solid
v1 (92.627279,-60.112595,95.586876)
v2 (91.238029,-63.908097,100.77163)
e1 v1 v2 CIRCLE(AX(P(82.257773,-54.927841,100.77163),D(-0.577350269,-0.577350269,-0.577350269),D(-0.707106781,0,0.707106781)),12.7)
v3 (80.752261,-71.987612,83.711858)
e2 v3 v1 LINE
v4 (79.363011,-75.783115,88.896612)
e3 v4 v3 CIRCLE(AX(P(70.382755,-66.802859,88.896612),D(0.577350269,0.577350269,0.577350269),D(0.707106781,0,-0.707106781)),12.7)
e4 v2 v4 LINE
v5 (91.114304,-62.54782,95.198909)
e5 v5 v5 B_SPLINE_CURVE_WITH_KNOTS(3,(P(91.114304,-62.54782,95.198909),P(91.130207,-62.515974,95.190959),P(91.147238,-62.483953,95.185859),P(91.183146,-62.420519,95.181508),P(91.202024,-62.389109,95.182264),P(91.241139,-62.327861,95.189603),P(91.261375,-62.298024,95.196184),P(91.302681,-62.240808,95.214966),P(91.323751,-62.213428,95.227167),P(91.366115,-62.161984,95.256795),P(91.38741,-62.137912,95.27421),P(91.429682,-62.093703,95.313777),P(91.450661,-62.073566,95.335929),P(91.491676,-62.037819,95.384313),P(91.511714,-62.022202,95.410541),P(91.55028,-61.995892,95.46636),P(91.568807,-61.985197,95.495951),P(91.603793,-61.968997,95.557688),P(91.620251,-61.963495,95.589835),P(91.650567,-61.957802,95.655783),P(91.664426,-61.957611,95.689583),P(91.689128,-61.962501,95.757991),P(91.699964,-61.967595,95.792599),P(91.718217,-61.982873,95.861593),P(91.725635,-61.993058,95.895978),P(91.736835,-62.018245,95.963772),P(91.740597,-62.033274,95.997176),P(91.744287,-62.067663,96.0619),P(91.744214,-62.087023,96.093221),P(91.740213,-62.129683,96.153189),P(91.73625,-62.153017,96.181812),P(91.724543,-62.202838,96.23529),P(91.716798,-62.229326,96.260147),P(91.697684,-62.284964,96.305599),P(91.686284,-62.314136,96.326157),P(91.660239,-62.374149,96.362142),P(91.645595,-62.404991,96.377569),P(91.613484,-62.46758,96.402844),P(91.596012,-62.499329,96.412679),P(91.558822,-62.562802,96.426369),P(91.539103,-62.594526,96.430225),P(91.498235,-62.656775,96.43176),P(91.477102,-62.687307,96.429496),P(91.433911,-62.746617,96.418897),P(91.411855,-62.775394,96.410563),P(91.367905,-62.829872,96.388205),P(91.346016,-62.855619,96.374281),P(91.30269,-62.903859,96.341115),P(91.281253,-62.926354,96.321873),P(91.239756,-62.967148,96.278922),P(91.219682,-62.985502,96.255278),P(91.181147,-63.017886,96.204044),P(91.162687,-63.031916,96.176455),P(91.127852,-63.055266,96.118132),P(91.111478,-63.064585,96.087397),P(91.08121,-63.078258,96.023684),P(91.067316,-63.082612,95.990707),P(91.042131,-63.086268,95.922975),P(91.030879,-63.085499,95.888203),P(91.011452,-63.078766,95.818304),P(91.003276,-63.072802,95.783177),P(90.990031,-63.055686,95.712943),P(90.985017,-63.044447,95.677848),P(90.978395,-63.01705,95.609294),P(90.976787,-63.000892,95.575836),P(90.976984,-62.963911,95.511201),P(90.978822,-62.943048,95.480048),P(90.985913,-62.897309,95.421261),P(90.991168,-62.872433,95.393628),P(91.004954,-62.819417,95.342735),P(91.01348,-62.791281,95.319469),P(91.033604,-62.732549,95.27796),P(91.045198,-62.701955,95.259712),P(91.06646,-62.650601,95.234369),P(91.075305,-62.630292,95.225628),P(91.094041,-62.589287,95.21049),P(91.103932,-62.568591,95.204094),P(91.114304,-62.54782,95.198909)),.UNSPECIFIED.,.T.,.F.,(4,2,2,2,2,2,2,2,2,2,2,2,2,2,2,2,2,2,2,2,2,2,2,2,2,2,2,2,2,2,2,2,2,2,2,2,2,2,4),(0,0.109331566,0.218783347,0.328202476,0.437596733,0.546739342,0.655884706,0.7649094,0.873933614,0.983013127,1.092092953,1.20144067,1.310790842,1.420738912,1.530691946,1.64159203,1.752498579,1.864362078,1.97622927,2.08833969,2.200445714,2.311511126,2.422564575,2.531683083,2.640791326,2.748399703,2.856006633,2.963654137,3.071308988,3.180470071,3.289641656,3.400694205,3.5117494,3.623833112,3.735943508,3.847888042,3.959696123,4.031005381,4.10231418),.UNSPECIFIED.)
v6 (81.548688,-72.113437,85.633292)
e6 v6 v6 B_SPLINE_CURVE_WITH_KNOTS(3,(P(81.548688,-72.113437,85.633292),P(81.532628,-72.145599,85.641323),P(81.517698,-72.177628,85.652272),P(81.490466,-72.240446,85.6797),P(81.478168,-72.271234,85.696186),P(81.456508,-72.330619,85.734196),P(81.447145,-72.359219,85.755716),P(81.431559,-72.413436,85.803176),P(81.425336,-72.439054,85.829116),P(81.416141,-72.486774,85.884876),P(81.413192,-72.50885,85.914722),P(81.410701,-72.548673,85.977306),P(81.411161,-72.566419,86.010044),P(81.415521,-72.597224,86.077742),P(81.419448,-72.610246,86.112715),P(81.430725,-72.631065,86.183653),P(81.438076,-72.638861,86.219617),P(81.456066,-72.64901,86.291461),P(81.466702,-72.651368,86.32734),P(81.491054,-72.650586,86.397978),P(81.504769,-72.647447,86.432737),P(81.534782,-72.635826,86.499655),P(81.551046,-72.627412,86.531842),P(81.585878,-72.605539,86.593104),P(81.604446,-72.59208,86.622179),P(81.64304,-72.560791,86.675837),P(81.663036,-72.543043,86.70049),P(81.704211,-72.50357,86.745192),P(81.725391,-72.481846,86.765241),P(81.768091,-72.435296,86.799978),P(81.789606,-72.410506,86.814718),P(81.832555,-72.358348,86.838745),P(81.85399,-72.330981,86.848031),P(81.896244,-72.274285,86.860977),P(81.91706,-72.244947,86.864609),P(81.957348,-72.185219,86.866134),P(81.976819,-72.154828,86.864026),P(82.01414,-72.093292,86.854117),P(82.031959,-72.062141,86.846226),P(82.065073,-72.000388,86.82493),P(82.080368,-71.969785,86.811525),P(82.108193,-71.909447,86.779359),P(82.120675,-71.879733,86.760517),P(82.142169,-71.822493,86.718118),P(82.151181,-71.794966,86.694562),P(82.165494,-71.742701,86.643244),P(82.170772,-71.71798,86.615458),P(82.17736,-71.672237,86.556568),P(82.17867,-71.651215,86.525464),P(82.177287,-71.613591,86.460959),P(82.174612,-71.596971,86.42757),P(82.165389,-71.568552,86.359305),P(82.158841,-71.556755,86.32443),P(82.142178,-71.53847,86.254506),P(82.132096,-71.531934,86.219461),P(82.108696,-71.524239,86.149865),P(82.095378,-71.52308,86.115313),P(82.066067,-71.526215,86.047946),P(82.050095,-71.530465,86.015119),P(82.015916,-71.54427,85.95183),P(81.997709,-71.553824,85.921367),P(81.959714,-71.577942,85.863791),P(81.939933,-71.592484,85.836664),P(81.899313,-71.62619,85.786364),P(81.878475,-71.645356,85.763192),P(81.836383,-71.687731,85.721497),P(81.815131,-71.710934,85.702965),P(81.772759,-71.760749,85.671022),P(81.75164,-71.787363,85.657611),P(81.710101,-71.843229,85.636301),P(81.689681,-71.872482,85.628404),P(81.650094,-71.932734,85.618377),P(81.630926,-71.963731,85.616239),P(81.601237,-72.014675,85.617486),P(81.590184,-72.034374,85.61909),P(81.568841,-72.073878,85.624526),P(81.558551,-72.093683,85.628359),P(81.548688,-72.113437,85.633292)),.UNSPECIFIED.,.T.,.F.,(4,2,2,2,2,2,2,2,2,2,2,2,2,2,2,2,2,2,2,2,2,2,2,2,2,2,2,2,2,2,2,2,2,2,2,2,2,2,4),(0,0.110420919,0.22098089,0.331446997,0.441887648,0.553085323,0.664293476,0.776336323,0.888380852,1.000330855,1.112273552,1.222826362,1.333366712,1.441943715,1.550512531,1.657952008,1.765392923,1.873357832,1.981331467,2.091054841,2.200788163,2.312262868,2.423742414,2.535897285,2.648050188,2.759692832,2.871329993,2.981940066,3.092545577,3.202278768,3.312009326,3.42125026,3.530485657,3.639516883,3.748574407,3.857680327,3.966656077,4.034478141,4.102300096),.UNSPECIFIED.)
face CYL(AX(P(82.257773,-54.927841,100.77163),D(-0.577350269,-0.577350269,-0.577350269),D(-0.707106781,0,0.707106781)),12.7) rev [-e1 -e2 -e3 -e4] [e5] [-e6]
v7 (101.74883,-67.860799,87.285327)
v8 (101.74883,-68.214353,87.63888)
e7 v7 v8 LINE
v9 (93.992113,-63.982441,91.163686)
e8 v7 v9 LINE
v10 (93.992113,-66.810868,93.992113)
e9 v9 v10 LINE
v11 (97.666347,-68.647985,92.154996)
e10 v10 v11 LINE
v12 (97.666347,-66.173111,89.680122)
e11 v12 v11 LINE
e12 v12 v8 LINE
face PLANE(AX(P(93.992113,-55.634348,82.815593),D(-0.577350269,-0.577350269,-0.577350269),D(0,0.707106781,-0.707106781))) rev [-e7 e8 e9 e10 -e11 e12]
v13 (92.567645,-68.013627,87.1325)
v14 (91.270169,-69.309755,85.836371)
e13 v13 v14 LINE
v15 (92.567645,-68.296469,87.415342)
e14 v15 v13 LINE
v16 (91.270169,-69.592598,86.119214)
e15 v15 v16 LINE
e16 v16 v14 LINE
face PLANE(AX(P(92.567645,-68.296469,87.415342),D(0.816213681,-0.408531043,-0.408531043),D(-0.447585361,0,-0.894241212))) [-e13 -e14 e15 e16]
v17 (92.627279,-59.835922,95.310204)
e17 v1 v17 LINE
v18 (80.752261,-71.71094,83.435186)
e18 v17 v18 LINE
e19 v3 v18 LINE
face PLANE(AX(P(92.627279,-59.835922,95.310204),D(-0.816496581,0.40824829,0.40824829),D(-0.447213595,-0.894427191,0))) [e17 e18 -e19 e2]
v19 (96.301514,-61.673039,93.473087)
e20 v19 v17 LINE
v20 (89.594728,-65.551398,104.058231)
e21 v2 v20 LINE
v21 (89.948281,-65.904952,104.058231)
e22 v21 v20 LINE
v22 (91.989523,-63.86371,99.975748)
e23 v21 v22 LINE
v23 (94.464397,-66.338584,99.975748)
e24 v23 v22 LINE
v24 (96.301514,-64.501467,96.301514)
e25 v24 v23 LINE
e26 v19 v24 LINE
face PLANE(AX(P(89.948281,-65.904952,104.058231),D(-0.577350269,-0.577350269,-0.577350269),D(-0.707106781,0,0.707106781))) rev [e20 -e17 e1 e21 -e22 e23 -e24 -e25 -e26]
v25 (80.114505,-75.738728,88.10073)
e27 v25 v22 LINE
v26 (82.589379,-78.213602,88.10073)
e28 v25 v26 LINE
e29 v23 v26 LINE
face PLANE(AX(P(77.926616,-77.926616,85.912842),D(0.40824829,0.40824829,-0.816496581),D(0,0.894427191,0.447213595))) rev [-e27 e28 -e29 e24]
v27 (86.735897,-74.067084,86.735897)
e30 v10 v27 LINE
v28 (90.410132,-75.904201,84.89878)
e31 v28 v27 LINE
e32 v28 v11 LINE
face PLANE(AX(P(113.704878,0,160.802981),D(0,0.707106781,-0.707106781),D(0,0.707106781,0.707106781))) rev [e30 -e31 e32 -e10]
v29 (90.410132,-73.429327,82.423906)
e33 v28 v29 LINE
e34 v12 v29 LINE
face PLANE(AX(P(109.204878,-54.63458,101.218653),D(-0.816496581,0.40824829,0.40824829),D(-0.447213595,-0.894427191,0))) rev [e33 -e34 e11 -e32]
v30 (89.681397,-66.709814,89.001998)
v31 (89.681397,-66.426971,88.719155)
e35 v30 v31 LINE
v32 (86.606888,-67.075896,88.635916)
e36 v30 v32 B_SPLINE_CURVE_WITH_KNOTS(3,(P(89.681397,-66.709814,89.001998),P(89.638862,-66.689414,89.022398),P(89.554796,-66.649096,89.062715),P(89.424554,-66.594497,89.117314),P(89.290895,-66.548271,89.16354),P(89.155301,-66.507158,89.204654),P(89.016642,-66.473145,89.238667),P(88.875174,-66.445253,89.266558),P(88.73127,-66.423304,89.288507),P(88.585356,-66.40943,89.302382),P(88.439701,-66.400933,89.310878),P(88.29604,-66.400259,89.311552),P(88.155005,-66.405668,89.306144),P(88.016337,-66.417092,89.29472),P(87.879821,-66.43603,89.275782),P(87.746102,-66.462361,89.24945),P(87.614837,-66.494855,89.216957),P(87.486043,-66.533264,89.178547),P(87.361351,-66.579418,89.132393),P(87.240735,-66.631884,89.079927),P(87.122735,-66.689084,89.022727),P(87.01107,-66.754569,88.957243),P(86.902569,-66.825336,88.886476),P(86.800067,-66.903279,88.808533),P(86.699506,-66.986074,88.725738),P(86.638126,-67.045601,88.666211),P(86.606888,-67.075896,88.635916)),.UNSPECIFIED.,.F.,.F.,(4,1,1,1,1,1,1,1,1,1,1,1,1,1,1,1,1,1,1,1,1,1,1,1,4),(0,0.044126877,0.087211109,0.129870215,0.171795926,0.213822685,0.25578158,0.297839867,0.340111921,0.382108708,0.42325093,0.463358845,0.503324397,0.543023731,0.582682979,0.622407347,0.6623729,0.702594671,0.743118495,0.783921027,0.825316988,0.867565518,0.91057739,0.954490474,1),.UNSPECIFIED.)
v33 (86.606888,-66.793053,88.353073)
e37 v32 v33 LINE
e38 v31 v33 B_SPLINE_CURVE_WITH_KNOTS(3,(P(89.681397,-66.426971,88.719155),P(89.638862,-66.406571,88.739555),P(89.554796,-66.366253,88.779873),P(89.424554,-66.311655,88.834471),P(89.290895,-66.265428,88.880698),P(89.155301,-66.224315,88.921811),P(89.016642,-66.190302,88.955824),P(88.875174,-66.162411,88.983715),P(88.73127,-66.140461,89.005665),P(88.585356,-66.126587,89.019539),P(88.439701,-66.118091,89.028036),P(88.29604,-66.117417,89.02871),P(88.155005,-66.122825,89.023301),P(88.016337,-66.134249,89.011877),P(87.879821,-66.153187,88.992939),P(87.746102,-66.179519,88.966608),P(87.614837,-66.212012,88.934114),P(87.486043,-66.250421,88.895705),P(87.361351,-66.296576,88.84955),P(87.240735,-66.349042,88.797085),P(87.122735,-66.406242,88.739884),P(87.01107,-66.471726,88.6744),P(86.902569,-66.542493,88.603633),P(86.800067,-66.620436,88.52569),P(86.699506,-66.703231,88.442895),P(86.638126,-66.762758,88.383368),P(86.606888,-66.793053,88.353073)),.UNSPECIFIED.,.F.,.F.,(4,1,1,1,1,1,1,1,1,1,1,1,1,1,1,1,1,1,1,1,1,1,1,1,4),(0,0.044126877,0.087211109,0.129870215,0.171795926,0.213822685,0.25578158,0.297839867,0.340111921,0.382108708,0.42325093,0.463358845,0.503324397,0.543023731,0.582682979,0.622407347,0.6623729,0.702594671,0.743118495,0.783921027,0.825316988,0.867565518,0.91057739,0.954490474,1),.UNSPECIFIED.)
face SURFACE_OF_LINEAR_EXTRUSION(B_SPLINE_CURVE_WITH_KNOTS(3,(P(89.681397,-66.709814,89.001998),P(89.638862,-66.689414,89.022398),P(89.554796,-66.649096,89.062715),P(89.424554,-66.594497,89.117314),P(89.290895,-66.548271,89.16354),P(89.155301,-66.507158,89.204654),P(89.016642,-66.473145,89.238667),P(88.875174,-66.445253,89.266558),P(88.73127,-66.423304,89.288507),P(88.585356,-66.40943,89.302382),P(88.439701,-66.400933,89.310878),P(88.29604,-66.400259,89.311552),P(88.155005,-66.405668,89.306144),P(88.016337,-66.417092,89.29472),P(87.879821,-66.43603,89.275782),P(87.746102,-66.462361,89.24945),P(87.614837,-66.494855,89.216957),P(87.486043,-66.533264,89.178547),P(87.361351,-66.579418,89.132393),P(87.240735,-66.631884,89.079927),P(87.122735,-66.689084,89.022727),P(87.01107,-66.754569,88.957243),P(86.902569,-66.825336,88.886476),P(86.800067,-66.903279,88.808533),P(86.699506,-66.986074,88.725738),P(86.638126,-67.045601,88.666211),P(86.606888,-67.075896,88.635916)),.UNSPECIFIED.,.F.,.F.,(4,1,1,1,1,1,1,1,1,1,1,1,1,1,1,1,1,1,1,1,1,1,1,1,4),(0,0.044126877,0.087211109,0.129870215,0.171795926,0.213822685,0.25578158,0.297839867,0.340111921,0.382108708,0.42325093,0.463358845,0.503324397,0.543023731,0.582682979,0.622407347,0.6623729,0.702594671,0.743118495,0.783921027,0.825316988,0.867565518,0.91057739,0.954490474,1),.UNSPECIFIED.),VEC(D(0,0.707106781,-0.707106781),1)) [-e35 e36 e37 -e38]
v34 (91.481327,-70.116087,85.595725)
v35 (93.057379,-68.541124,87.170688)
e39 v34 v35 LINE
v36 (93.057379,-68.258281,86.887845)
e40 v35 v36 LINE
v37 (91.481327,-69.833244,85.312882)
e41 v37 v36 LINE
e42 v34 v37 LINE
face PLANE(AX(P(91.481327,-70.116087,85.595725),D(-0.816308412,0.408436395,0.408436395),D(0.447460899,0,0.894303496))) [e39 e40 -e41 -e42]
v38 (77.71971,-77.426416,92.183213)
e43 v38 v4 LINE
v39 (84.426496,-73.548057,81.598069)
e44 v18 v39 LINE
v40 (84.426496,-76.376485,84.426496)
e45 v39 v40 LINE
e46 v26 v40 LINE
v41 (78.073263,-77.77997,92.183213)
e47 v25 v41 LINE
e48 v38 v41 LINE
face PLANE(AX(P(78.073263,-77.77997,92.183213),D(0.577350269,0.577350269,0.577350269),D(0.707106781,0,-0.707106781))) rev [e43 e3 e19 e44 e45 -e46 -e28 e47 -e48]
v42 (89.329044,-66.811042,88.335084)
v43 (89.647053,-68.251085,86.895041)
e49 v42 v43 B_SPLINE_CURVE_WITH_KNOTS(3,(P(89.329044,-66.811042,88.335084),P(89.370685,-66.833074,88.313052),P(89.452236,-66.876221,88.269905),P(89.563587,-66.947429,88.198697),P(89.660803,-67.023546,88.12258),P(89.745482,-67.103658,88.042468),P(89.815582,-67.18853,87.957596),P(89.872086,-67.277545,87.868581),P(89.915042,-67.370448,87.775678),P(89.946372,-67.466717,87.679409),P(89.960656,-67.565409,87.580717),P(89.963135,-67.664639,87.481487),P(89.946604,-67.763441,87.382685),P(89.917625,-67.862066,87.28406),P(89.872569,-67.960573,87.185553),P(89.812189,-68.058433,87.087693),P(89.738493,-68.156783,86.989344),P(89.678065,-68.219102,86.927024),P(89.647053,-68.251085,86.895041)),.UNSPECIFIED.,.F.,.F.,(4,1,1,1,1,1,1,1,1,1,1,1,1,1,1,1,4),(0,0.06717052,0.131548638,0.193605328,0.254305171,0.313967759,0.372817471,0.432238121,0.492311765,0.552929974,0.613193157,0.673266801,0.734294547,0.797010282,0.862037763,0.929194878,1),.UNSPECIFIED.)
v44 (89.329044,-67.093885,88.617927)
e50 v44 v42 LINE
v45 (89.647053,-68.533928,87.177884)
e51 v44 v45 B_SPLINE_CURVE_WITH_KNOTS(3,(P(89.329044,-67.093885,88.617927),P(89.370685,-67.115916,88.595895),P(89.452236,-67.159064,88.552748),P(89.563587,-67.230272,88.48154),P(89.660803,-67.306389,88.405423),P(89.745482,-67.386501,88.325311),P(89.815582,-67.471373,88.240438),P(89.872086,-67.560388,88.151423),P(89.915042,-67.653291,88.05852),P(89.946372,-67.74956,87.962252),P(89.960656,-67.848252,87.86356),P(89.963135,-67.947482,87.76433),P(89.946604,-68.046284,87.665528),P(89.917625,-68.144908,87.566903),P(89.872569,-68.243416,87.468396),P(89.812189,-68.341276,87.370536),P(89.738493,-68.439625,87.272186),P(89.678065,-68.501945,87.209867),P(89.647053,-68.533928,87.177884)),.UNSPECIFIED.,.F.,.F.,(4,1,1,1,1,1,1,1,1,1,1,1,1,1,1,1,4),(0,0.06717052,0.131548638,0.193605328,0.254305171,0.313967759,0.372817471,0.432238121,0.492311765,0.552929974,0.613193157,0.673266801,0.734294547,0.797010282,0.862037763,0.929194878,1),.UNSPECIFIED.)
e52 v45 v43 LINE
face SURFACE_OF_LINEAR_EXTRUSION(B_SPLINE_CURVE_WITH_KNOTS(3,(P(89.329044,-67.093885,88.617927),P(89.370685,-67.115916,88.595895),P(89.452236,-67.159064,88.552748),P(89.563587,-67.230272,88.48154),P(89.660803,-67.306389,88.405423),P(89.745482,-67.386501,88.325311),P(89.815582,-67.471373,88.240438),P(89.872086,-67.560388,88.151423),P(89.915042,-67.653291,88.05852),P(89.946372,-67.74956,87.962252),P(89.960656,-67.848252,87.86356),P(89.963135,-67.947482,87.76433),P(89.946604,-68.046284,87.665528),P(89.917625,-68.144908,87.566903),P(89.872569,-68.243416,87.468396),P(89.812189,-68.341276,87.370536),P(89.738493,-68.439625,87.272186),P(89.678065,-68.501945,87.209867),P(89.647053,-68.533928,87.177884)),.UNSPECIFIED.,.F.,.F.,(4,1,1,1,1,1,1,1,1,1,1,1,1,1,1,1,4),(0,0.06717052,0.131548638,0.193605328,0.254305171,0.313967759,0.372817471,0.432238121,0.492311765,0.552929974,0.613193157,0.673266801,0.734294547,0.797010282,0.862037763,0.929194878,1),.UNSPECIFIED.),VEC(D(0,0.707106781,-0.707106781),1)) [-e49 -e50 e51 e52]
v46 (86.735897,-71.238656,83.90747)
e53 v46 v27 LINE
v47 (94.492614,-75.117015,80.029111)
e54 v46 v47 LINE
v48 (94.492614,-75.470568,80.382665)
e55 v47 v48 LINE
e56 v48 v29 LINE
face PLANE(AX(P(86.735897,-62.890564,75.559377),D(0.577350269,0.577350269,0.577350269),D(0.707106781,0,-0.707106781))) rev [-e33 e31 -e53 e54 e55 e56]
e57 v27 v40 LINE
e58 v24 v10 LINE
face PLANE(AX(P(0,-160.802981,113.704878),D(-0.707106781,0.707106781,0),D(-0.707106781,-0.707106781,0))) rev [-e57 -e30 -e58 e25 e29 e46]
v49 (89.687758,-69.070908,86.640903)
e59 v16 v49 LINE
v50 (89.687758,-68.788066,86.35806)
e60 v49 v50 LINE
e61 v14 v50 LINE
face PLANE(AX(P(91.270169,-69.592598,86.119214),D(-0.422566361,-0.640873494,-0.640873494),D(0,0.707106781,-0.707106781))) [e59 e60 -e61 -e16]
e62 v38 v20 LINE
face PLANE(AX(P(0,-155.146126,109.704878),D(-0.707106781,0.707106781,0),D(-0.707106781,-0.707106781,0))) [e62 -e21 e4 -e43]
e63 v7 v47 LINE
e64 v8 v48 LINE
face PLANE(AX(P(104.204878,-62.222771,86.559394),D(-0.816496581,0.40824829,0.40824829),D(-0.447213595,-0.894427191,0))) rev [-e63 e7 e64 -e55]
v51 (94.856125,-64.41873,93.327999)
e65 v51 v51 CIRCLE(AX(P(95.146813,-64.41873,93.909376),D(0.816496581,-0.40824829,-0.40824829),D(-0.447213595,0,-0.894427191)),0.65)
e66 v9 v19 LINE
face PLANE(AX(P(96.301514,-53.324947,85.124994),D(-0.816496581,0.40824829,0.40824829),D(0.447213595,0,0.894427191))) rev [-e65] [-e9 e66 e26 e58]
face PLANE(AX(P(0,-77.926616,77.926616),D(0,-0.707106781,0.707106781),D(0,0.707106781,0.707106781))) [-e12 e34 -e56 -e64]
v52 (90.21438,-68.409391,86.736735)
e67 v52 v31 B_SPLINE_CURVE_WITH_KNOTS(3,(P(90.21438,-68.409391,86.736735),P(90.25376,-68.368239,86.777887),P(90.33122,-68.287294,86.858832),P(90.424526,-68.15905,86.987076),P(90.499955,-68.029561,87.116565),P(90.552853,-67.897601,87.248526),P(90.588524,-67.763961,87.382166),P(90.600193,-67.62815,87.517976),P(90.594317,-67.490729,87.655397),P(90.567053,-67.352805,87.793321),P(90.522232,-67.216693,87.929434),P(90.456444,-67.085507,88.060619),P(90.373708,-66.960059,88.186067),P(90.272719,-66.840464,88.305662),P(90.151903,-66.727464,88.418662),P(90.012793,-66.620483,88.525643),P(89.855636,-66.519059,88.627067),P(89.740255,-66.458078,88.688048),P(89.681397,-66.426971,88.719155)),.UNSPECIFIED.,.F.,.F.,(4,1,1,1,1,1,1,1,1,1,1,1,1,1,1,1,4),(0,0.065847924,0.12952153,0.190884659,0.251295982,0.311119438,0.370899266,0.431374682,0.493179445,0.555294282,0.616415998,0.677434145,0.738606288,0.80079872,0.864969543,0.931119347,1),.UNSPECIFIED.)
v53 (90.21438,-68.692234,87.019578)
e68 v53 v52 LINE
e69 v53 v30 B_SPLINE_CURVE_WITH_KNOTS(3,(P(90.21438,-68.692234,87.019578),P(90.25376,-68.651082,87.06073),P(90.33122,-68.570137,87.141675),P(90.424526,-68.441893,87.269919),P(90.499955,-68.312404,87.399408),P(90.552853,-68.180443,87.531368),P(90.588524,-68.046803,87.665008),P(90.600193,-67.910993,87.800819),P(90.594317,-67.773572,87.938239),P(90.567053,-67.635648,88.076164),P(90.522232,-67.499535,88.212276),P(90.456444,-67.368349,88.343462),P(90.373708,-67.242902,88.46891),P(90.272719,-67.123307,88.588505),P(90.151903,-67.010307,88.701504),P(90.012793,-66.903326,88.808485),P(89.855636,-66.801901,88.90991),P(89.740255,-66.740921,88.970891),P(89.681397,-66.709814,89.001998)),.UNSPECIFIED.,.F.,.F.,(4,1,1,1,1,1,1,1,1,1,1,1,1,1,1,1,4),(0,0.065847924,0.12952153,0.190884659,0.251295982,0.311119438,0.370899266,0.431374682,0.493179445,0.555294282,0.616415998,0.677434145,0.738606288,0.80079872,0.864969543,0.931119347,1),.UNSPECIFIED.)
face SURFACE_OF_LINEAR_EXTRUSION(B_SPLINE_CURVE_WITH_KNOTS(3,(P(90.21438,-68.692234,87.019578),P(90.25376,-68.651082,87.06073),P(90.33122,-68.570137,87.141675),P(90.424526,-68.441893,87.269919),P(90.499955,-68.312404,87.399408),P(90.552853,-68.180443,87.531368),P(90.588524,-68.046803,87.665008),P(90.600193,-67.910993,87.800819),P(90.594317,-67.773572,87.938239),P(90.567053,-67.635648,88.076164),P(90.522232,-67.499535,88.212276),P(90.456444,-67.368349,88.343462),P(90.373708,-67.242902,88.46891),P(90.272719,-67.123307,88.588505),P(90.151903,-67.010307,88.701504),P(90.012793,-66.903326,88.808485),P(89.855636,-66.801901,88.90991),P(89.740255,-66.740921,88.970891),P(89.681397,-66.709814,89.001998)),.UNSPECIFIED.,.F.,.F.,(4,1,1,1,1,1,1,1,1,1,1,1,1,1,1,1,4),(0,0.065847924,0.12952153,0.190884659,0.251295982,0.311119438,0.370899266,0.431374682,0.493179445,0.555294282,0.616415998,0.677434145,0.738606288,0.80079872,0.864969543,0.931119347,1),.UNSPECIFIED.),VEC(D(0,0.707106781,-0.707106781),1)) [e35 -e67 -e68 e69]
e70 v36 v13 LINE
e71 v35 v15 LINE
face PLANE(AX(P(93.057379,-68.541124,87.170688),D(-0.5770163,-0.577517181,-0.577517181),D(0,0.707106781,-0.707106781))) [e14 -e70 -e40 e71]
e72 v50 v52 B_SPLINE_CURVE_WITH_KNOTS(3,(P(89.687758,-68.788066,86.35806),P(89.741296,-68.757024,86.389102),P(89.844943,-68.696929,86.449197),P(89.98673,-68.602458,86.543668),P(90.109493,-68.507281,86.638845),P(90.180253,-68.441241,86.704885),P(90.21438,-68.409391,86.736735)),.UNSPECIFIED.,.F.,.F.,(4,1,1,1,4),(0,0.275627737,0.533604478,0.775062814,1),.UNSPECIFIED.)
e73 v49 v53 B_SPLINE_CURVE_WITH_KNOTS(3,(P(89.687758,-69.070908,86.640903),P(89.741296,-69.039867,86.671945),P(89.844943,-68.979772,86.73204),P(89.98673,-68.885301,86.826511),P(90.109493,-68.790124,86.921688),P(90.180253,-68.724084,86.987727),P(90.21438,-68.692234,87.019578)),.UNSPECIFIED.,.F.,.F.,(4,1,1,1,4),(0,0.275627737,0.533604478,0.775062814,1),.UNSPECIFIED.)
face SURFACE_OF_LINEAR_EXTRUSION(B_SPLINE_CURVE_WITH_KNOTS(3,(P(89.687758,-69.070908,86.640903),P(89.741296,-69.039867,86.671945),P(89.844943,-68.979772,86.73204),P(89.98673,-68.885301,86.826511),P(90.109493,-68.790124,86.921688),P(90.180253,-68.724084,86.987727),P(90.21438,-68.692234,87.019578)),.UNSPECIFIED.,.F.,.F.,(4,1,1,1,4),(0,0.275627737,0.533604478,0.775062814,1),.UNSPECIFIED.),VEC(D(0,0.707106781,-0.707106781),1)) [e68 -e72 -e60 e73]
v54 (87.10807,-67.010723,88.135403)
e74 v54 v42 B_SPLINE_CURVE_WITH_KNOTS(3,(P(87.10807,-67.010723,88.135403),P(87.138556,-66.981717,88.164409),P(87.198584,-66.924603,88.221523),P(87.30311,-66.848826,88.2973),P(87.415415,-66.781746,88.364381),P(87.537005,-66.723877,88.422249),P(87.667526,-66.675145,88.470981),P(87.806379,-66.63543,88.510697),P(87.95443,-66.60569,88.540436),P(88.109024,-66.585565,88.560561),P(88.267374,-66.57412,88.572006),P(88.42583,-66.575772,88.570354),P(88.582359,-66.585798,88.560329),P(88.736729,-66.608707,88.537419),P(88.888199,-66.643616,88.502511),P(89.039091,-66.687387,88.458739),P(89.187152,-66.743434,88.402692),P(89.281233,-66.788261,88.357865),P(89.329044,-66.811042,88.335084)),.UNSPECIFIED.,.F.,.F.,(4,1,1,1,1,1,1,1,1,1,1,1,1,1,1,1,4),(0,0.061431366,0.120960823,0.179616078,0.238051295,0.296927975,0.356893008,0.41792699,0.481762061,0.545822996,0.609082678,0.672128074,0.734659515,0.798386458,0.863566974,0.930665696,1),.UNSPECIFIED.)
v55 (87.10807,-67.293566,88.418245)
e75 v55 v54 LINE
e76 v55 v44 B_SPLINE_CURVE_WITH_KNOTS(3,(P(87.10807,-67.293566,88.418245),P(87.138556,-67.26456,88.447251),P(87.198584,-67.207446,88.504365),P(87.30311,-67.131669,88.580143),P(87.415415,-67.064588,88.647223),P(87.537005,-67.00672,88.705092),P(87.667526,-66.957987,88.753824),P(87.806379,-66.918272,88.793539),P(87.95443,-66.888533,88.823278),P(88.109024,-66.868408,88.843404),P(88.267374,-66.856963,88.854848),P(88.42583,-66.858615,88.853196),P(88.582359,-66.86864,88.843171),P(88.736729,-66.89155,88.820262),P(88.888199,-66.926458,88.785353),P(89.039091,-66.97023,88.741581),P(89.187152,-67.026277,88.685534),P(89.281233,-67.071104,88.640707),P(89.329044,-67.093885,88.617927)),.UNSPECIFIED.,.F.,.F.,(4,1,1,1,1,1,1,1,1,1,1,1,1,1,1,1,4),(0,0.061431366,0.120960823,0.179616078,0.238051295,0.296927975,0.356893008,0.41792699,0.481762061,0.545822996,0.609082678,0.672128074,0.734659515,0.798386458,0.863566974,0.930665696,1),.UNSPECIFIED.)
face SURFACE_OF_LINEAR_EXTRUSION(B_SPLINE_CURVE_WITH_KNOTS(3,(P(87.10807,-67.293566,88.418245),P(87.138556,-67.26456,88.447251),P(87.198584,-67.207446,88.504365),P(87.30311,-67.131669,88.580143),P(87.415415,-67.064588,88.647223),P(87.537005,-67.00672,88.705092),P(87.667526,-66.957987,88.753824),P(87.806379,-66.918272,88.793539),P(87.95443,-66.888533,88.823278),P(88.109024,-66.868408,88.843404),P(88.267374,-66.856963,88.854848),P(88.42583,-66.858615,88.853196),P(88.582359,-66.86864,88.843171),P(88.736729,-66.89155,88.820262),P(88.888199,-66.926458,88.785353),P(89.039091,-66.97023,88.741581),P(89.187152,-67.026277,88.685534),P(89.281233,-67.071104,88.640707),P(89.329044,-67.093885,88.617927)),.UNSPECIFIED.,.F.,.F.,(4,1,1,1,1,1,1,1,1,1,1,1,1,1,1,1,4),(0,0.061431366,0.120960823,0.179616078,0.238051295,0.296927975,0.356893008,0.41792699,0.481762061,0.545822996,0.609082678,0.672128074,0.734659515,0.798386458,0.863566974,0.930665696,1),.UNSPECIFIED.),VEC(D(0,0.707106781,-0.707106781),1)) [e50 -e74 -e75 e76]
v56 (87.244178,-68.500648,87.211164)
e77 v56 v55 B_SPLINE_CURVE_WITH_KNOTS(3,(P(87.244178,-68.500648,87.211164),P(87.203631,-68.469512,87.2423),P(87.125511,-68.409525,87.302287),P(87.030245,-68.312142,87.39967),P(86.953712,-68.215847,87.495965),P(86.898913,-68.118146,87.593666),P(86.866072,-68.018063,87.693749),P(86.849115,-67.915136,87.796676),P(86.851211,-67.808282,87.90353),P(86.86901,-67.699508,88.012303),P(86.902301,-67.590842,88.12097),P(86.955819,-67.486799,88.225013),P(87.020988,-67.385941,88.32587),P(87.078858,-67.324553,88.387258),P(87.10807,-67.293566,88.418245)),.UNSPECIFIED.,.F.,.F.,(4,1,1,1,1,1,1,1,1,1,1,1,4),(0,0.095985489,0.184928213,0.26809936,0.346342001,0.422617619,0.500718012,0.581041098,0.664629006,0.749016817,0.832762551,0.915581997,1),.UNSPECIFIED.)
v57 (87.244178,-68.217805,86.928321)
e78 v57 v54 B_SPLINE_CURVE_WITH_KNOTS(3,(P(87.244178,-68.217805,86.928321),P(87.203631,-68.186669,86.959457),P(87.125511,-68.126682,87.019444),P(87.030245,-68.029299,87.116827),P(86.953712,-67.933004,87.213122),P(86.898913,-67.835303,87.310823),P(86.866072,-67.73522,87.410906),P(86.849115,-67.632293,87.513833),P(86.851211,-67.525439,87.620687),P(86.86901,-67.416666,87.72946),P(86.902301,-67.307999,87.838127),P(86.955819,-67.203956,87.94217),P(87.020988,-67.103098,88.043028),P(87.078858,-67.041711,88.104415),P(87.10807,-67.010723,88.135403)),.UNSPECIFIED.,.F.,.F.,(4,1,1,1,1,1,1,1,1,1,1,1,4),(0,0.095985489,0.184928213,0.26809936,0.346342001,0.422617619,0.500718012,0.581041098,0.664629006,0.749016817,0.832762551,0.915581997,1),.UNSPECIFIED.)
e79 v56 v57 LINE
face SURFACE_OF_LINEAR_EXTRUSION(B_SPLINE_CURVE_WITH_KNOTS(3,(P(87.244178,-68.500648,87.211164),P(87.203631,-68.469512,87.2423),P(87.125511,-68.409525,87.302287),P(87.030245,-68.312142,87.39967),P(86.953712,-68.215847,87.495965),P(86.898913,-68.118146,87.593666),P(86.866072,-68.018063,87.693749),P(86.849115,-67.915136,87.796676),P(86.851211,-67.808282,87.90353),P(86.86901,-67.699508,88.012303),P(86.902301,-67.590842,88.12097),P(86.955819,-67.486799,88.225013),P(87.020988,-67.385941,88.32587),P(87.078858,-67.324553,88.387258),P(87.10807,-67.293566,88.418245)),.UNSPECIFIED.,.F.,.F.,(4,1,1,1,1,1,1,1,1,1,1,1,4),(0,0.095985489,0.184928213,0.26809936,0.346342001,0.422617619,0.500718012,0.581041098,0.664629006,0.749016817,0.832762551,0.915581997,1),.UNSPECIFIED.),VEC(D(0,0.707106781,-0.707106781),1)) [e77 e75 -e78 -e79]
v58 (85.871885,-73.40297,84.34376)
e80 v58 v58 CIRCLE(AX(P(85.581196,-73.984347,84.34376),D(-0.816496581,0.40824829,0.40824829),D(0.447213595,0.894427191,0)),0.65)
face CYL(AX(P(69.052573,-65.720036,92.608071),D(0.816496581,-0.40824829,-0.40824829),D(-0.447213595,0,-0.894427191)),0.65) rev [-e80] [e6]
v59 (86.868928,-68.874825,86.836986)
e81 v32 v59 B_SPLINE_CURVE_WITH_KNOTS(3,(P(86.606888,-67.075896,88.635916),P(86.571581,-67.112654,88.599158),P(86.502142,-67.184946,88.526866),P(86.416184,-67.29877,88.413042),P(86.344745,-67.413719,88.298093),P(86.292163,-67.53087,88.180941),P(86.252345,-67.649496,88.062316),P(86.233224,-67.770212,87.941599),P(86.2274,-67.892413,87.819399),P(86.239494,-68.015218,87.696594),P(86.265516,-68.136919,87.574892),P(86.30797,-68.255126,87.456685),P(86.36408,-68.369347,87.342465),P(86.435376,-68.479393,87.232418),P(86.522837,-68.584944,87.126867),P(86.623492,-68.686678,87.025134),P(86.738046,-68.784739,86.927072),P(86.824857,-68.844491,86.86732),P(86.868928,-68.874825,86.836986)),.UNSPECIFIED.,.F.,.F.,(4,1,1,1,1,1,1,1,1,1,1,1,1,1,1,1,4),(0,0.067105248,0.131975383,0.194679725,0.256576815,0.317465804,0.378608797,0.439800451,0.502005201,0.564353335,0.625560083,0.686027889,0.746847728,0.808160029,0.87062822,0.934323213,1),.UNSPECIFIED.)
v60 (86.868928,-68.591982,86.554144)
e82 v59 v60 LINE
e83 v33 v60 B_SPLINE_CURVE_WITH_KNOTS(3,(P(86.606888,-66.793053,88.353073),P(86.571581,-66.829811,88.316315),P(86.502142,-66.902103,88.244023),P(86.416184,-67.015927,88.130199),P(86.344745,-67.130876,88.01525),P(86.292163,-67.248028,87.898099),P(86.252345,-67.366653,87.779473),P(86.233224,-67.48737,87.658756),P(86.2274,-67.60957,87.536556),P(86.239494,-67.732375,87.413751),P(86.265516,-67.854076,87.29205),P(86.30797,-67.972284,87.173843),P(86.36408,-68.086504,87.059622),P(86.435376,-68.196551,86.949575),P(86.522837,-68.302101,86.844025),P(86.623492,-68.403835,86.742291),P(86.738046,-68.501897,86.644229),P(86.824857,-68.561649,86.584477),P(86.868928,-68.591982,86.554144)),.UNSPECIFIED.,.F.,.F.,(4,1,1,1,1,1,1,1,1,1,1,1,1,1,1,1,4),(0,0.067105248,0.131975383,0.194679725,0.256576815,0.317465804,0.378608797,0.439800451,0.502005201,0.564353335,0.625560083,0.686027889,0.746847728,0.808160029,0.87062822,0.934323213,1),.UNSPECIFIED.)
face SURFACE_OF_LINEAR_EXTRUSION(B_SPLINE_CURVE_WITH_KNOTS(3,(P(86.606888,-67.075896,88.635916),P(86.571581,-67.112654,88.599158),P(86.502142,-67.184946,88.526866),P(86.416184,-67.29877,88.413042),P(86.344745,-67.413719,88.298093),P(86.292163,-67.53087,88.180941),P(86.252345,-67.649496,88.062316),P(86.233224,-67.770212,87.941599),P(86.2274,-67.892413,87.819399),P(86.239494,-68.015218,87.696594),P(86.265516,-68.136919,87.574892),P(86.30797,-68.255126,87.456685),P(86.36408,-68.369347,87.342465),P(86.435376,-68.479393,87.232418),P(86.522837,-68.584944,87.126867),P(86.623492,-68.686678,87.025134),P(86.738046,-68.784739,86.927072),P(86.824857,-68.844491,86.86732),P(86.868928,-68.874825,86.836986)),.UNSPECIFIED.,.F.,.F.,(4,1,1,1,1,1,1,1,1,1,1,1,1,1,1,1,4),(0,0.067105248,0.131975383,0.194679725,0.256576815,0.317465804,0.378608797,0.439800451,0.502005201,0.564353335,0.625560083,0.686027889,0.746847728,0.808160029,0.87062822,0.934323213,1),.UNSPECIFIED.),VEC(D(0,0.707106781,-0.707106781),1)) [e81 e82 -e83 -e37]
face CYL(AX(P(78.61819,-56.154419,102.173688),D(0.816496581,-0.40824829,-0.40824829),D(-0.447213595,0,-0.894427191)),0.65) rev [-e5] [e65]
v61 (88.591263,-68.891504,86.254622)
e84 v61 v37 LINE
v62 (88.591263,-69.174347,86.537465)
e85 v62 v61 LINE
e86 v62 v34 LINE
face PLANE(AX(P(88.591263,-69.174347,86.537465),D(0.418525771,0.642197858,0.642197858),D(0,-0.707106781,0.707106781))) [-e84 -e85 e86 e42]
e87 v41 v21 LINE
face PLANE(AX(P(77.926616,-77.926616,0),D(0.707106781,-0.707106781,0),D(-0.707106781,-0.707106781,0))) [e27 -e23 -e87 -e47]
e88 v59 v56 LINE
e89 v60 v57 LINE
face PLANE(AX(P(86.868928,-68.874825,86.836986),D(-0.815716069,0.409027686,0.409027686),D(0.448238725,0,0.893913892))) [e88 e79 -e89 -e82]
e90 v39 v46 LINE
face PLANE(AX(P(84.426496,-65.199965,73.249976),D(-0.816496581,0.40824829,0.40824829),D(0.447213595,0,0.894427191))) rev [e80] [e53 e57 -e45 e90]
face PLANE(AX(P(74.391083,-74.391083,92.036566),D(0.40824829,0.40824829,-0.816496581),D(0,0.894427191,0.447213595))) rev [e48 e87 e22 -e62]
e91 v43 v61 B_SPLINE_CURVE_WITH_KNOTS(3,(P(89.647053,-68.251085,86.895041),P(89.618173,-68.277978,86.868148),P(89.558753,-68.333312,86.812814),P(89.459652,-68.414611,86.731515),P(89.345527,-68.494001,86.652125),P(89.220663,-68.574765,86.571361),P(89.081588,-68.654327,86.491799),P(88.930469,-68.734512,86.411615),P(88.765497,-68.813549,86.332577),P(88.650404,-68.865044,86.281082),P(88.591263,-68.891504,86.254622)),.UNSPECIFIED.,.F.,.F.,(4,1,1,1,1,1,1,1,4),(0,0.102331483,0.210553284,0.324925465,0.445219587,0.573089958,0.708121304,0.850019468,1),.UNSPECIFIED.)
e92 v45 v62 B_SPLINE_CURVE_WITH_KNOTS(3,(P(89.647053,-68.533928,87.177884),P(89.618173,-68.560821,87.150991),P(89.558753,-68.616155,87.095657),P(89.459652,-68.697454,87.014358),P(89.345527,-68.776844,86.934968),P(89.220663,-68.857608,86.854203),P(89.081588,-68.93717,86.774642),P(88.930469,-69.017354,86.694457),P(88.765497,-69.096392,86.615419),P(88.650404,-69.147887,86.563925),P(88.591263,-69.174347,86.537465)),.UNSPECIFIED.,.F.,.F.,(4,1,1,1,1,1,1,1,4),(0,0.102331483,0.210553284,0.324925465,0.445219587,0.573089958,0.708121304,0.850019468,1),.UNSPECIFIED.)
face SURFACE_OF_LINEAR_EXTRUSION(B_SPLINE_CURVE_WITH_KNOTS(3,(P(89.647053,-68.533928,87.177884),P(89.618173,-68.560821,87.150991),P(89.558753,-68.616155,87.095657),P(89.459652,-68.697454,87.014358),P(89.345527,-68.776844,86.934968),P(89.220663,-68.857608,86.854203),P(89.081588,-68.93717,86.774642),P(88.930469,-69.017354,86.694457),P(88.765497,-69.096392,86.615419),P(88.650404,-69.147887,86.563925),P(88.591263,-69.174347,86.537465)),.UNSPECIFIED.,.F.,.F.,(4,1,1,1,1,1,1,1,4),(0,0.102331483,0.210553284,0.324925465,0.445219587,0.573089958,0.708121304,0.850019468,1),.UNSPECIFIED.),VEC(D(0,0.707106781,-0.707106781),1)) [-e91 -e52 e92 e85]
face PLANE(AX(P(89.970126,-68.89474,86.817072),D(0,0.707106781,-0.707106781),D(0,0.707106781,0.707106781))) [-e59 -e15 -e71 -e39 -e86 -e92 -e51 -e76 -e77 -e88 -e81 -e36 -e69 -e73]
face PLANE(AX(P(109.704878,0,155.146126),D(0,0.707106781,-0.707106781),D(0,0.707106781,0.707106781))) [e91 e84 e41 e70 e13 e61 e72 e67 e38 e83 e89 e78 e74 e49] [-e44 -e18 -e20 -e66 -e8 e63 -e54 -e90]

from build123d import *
from build123d.topology import SkipClean

# Parameters (mm, degrees)
STOCK_GOUX_START         = 53.391336338
STOCK_GOUX_LIKED_1_DEPTH = 20.568134432
CUT_EXTRUDE1_DEPTH       = 109.511360444
BOSS_EXTRUDE1_DEPTH      = 20.568134
FILLET1_R                = 12.7
SKETCH3_R                = 0.64999997
CUT_EXTRUDE2_DEPTH       = 149.612005727
CUT_EXTRUDE3_DEPTH       = 0.4


# Read off the part's stored shape, not the designer's step: Stock-Goux Liked-1
with BuildPart() as part:
    # Stock-Goux Liked-1 outline → Stock-Goux Liked-1 (new body)
    with BuildSketch(Plane(origin=(0, 0, 0), x_dir=(0.8164965809277512, -0.4082482904637994, -0.40824829046387656), z_dir=(0.5773502691895902, 0.5773502691895891, 0.5773502691896982)).offset(STOCK_GOUX_START)):
        Polygon((57.433440297, -119.932119095), (57.866453013, -120.182119103), (60.366452966, -115.851992166), (63.397541976, -117.601992222), (65.647541921, -113.704878), (70.147541811, -113.704878), (70.147541811, -110.204877888), (75.147541717, -110.204877888), (75.147541717, -109.704877872), (63.338140771, -109.704877872), align=None)
    extrude(amount=STOCK_GOUX_LIKED_1_DEPTH)

    # Sketch1 → Cut-Extrude1 (cut, through all)
    with BuildSketch(Plane(origin=(0, -80.401490288, 80.401490288), x_dir=(1, 0, 0), z_dir=(0, -0.7071067811865477, 0.7071067811865475))):
        Polygon((84.426495932, 5.692217571), (86.735897009, 8.958203895), (94.492614361, 3.473376455), (92.183213285, 0.207390132), align=None)
        Polygon((96.301513883, 22.486029011), (104.058231236, 17.001201571), (101.748830159, 13.735215248), (93.992112807, 19.220042687), align=None)
    extrude(amount=-CUT_EXTRUDE1_DEPTH, mode=Mode.SUBTRACT)

    # Sketch2 → Boss-Extrude1 (add)
    with SkipClean():  # the faces are left unmerged after this step: merging them gives an invalid solid
        with BuildSketch(Plane(origin=(30.825502407, 30.825502407, 30.825502407), x_dir=(-0.40824829046391425, -0.4082482904639143, 0.8164965809276746), z_dir=(-0.5773502691895895, -0.5773502691895894, -0.5773502691896983))):
            Polygon((62.183440195, -111.704877936), (65.647541921, -113.704878), (67.897541921, -109.807763683), (64.433440195, -107.807763619), align=None)
        extrude(amount=-BOSS_EXTRUDE1_DEPTH)

    # Fillet1
    fillet1_edges = [part.edges().sort_by_distance(p)[0] for p in [
        (86.689770169, -68.456355976, 92.055619581),
    ]]
    fillet(fillet1_edges, radius=FILLET1_R)

    # Sketch3 → Cut-Extrude2 (cut, through all)
    with SkipClean():  # the faces are left unmerged after this step: merging them gives an invalid solid
        with BuildSketch(Plane(origin=(53.600993525, -26.800496763, -26.800496763), x_dir=(-0.36514837167009556, 0.18257418583503127, -0.9128709291752878), z_dir=(0.8164965809277506, -0.40824829046383865, -0.4082482904638387))):
            with Locations(Location((-132.231040931, -15.066915515, 0), (0, 0, 348.463040967))):
                Circle(SKETCH3_R)
        cut_extrude2 = extrude(amount=-CUT_EXTRUDE2_DEPTH, mode=Mode.SUBTRACT)

    # Mirror1: Cut-Extrude2 across plane
    with SkipClean():  # the faces are left unmerged after this step: merging them gives an invalid solid
        add(cut_extrude2.mirror(Plane(origin=(36.763011383, 36.763011383, 36.763011383), x_dir=(-0.40824829046390154, -0.40824829046390165, 0.8164965809276874), z_dir=(0.5773502691895985, 0.5773502691895986, 0.5773502691896802))), mode=Mode.SUBTRACT)

    # Sketch4 → Cut-Extrude3 (cut)
    with SkipClean():  # the faces are left unmerged after this step: merging them gives an invalid solid
        with BuildSketch(Plane(origin=(0, -77.573063073, 77.573063073), x_dir=(1, 0, 0), z_dir=(0, 0.7071067811865477, -0.7071067811865475))):
            with BuildLine():
                Line((93.057379032, -13.173091082), (92.567645459, -13.519084672))
                Line((92.567645459, -13.519084672), (91.270169497, -11.686081867))
                Line((91.270169497, -11.686081867), (89.687757638, -12.423862316))
                add(Edge.make_bspline(
                    [(89.687757638, -12.423862316), (89.741295568, -12.46776154), (89.844942898, -12.552748714), (89.986729771, -12.686351444), (90.109493379, -12.820951582), (90.180253462, -12.914346072), (90.214380234, -12.959389159)],
                    knots=[0, 0, 0, 0, 1.102510947, 2.134417912, 3.100251258, 4, 4, 4, 4], degree=3))
                add(Edge.make_bspline(
                    [(90.214380234, -12.959389159), (90.253760272, -13.017586925), (90.331220007, -13.132060751), (90.424525722, -13.313424806), (90.499954525, -13.496549573), (90.552853451, -13.683170388), (90.588524358, -13.872165751), (90.600192512, -14.064230957), (90.594316704, -14.258572886), (90.567052813, -14.453627198), (90.522232401, -14.646119682), (90.456443819, -14.831644428), (90.37370764, -15.009053992), (90.272718514, -15.178186861), (90.151902914, -15.337992616), (90.012792553, -15.489286627), (89.855636039, -15.632722917), (89.740254809, -15.718962844), (89.681397462, -15.762954864)],
                    knots=[0, 0, 0, 0, 1.053566777, 2.072344485, 3.054154547, 4.020735706, 4.977911009, 5.934388254, 6.901994919, 7.890871114, 8.884708514, 9.862655974, 10.838946315, 11.817700602, 12.812779523, 13.839512687, 14.897909552, 16, 16, 16, 16], degree=3))
                add(Edge.make_bspline(
                    [(89.681397462, -15.762954864), (89.638861949, -15.79180454), (89.554795968, -15.84882222), (89.424554492, -15.926036449), (89.290895408, -15.991410287), (89.155300895, -16.049553503), (89.016642135, -16.097655089), (88.875174038, -16.137099385), (88.731270115, -16.168140221), (88.585356233, -16.187761829), (88.439700765, -16.199777545), (88.296040345, -16.200730613), (88.155005398, -16.193081949), (88.016337233, -16.176925914), (87.879820972, -16.150143257), (87.746101629, -16.112905095), (87.614836668, -16.066952156), (87.486042986, -16.012633338), (87.36135061, -15.94736132), (87.240735277, -15.873163467), (87.122735013, -15.792270246), (87.011070103, -15.699661066), (86.902568847, -15.599581488), (86.800066565, -15.489353904), (86.699506263, -15.37226378), (86.638126187, -15.288079908), (86.606888247, -15.245236515)],
                    knots=[0, 0, 0, 0, 1.059045057, 2.093066608, 3.116885153, 4.123102215, 5.131744447, 6.138757912, 7.148156815, 8.162686115, 9.170608983, 10.158022319, 11.120612269, 12.079785529, 13.032569554, 13.984391495, 14.937776329, 15.896949589, 16.862272095, 17.834843879, 18.814104655, 19.80760772, 20.82157244, 21.85385735, 22.907771379, 24, 24, 24, 24], degree=3))
                add(Edge.make_bspline(
                    [(86.606888247, -15.245236515), (86.571580982, -15.193252636), (86.502142451, -15.091016336), (86.41618388, -14.93004522), (86.344744771, -14.767482877), (86.292163209, -14.601805216), (86.252344887, -14.434043372), (86.233224181, -14.263324381), (86.227400474, -14.090507286), (86.239494355, -13.916834049), (86.265515908, -13.744722824), (86.30797018, -13.577552607), (86.364080119, -13.416020283), (86.435375705, -13.260390942), (86.522836864, -13.111119621), (86.623492387, -12.96724671), (86.738046259, -12.828566566), (86.824857153, -12.744064342), (86.86892751, -12.701166002)],
                    knots=[0, 0, 0, 0, 1.073683973, 2.111606131, 3.114875596, 4.105229039, 5.079452871, 6.057740752, 7.036807216, 8.032083212, 9.029653356, 10.008961322, 10.976446223, 11.949563641, 12.930560464, 13.930051518, 14.949171403, 16, 16, 16, 16], degree=3))
                Line((86.86892751, -12.701166002), (87.244177911, -13.230332668))
                add(Edge.make_bspline(
                    [(87.244177911, -13.230332668), (87.203630602, -13.274365386), (87.125511073, -13.359199998), (87.030245223, -13.496920616), (86.953711988, -13.633102202), (86.89891325, -13.771272529), (86.866072042, -13.912811297), (86.849115424, -14.058372065), (86.851210509, -14.209486442), (86.86900954, -14.363314897), (86.902300542, -14.516992644), (86.955818974, -14.664132133), (87.020988019, -14.806766078), (87.078858378, -14.893581403), (87.108070138, -14.937403982)],
                    knots=[0, 0, 0, 0, 1.151825873, 2.219138558, 3.21719232, 4.156104017, 5.071411429, 6.008616142, 6.972493179, 7.975548077, 8.988201805, 9.993150609, 10.986983969, 12, 12, 12, 12], degree=3))
                add(Edge.make_bspline(
                    [(87.108070138, -14.937403982), (87.138555874, -14.978424636), (87.19858351, -15.059195946), (87.303110462, -15.166361235), (87.415414903, -15.261227558), (87.537005465, -15.343065931), (87.667525961, -15.411983911), (87.80637932, -15.468149642), (87.954429953, -15.510207129), (88.109024438, -15.538668693), (88.267373598, -15.554853821), (88.425830222, -15.552517547), (88.58235856, -15.538339817), (88.736728883, -15.505941209), (88.888199475, -15.456572805), (89.039090754, -15.394670176), (89.187152138, -15.315407609), (89.281232645, -15.252012671), (89.329043696, -15.219795809)],
                    knots=[0, 0, 0, 0, 0.982901861, 1.935373165, 2.873857243, 3.808820726, 4.750847603, 5.710288131, 6.686831843, 7.708192972, 8.733167937, 9.745322852, 10.754049183, 11.754552243, 12.77418333, 13.817071584, 14.890651141, 16, 16, 16, 16], degree=3))
                add(Edge.make_bspline(
                    [(89.329043696, -15.219795809), (89.37068488, -15.188638571), (89.452236147, -15.127619358), (89.563587258, -15.026915322), (89.660802629, -14.919270083), (89.74548165, -14.805974644), (89.815581792, -14.685946996), (89.872085801, -14.560060608), (89.915042433, -14.428675913), (89.946372379, -14.292531636), (89.960656297, -14.1529597), (89.963134707, -14.01262796), (89.946603574, -13.872900372), (89.917624638, -13.733424144), (89.872568669, -13.594113504), (89.812188994, -13.455718618), (89.738492589, -13.316631534), (89.678065145, -13.22849889), (89.64705251, -13.183267364)],
                    knots=[0, 0, 0, 0, 1.074728317, 2.104778202, 3.097685251, 4.068882731, 5.023484141, 5.965079531, 6.915809939, 7.876988247, 8.846879582, 9.811090509, 10.772268818, 11.748712747, 12.75216451, 13.792604211, 14.867118046, 16, 16, 16, 16], degree=3))
                add(Edge.make_bspline(
                    [(89.64705251, -13.183267364), (89.618173393, -13.145235048), (89.558752843, -13.066981231), (89.459652489, -12.952007275), (89.34552654, -12.839732315), (89.220663354, -12.725514625), (89.081587528, -12.612997782), (88.930468675, -12.499599482), (88.765496982, -12.387822996), (88.650403504, -12.314998695), (88.591263247, -12.277578261)],
                    knots=[0, 0, 0, 0, 0.818651868, 1.684426275, 2.599403717, 3.561756698, 4.584719662, 5.664970434, 6.800155744, 8, 8, 8, 8], degree=3))
                Line((88.591263247, -12.277578261), (91.48132735, -10.945757348))
                Line((91.48132735, -10.945757348), (93.057379032, -13.173091082))
            make_face()
        extrude(amount=-CUT_EXTRUDE3_DEPTH, mode=Mode.SUBTRACT)


solid = part.part
